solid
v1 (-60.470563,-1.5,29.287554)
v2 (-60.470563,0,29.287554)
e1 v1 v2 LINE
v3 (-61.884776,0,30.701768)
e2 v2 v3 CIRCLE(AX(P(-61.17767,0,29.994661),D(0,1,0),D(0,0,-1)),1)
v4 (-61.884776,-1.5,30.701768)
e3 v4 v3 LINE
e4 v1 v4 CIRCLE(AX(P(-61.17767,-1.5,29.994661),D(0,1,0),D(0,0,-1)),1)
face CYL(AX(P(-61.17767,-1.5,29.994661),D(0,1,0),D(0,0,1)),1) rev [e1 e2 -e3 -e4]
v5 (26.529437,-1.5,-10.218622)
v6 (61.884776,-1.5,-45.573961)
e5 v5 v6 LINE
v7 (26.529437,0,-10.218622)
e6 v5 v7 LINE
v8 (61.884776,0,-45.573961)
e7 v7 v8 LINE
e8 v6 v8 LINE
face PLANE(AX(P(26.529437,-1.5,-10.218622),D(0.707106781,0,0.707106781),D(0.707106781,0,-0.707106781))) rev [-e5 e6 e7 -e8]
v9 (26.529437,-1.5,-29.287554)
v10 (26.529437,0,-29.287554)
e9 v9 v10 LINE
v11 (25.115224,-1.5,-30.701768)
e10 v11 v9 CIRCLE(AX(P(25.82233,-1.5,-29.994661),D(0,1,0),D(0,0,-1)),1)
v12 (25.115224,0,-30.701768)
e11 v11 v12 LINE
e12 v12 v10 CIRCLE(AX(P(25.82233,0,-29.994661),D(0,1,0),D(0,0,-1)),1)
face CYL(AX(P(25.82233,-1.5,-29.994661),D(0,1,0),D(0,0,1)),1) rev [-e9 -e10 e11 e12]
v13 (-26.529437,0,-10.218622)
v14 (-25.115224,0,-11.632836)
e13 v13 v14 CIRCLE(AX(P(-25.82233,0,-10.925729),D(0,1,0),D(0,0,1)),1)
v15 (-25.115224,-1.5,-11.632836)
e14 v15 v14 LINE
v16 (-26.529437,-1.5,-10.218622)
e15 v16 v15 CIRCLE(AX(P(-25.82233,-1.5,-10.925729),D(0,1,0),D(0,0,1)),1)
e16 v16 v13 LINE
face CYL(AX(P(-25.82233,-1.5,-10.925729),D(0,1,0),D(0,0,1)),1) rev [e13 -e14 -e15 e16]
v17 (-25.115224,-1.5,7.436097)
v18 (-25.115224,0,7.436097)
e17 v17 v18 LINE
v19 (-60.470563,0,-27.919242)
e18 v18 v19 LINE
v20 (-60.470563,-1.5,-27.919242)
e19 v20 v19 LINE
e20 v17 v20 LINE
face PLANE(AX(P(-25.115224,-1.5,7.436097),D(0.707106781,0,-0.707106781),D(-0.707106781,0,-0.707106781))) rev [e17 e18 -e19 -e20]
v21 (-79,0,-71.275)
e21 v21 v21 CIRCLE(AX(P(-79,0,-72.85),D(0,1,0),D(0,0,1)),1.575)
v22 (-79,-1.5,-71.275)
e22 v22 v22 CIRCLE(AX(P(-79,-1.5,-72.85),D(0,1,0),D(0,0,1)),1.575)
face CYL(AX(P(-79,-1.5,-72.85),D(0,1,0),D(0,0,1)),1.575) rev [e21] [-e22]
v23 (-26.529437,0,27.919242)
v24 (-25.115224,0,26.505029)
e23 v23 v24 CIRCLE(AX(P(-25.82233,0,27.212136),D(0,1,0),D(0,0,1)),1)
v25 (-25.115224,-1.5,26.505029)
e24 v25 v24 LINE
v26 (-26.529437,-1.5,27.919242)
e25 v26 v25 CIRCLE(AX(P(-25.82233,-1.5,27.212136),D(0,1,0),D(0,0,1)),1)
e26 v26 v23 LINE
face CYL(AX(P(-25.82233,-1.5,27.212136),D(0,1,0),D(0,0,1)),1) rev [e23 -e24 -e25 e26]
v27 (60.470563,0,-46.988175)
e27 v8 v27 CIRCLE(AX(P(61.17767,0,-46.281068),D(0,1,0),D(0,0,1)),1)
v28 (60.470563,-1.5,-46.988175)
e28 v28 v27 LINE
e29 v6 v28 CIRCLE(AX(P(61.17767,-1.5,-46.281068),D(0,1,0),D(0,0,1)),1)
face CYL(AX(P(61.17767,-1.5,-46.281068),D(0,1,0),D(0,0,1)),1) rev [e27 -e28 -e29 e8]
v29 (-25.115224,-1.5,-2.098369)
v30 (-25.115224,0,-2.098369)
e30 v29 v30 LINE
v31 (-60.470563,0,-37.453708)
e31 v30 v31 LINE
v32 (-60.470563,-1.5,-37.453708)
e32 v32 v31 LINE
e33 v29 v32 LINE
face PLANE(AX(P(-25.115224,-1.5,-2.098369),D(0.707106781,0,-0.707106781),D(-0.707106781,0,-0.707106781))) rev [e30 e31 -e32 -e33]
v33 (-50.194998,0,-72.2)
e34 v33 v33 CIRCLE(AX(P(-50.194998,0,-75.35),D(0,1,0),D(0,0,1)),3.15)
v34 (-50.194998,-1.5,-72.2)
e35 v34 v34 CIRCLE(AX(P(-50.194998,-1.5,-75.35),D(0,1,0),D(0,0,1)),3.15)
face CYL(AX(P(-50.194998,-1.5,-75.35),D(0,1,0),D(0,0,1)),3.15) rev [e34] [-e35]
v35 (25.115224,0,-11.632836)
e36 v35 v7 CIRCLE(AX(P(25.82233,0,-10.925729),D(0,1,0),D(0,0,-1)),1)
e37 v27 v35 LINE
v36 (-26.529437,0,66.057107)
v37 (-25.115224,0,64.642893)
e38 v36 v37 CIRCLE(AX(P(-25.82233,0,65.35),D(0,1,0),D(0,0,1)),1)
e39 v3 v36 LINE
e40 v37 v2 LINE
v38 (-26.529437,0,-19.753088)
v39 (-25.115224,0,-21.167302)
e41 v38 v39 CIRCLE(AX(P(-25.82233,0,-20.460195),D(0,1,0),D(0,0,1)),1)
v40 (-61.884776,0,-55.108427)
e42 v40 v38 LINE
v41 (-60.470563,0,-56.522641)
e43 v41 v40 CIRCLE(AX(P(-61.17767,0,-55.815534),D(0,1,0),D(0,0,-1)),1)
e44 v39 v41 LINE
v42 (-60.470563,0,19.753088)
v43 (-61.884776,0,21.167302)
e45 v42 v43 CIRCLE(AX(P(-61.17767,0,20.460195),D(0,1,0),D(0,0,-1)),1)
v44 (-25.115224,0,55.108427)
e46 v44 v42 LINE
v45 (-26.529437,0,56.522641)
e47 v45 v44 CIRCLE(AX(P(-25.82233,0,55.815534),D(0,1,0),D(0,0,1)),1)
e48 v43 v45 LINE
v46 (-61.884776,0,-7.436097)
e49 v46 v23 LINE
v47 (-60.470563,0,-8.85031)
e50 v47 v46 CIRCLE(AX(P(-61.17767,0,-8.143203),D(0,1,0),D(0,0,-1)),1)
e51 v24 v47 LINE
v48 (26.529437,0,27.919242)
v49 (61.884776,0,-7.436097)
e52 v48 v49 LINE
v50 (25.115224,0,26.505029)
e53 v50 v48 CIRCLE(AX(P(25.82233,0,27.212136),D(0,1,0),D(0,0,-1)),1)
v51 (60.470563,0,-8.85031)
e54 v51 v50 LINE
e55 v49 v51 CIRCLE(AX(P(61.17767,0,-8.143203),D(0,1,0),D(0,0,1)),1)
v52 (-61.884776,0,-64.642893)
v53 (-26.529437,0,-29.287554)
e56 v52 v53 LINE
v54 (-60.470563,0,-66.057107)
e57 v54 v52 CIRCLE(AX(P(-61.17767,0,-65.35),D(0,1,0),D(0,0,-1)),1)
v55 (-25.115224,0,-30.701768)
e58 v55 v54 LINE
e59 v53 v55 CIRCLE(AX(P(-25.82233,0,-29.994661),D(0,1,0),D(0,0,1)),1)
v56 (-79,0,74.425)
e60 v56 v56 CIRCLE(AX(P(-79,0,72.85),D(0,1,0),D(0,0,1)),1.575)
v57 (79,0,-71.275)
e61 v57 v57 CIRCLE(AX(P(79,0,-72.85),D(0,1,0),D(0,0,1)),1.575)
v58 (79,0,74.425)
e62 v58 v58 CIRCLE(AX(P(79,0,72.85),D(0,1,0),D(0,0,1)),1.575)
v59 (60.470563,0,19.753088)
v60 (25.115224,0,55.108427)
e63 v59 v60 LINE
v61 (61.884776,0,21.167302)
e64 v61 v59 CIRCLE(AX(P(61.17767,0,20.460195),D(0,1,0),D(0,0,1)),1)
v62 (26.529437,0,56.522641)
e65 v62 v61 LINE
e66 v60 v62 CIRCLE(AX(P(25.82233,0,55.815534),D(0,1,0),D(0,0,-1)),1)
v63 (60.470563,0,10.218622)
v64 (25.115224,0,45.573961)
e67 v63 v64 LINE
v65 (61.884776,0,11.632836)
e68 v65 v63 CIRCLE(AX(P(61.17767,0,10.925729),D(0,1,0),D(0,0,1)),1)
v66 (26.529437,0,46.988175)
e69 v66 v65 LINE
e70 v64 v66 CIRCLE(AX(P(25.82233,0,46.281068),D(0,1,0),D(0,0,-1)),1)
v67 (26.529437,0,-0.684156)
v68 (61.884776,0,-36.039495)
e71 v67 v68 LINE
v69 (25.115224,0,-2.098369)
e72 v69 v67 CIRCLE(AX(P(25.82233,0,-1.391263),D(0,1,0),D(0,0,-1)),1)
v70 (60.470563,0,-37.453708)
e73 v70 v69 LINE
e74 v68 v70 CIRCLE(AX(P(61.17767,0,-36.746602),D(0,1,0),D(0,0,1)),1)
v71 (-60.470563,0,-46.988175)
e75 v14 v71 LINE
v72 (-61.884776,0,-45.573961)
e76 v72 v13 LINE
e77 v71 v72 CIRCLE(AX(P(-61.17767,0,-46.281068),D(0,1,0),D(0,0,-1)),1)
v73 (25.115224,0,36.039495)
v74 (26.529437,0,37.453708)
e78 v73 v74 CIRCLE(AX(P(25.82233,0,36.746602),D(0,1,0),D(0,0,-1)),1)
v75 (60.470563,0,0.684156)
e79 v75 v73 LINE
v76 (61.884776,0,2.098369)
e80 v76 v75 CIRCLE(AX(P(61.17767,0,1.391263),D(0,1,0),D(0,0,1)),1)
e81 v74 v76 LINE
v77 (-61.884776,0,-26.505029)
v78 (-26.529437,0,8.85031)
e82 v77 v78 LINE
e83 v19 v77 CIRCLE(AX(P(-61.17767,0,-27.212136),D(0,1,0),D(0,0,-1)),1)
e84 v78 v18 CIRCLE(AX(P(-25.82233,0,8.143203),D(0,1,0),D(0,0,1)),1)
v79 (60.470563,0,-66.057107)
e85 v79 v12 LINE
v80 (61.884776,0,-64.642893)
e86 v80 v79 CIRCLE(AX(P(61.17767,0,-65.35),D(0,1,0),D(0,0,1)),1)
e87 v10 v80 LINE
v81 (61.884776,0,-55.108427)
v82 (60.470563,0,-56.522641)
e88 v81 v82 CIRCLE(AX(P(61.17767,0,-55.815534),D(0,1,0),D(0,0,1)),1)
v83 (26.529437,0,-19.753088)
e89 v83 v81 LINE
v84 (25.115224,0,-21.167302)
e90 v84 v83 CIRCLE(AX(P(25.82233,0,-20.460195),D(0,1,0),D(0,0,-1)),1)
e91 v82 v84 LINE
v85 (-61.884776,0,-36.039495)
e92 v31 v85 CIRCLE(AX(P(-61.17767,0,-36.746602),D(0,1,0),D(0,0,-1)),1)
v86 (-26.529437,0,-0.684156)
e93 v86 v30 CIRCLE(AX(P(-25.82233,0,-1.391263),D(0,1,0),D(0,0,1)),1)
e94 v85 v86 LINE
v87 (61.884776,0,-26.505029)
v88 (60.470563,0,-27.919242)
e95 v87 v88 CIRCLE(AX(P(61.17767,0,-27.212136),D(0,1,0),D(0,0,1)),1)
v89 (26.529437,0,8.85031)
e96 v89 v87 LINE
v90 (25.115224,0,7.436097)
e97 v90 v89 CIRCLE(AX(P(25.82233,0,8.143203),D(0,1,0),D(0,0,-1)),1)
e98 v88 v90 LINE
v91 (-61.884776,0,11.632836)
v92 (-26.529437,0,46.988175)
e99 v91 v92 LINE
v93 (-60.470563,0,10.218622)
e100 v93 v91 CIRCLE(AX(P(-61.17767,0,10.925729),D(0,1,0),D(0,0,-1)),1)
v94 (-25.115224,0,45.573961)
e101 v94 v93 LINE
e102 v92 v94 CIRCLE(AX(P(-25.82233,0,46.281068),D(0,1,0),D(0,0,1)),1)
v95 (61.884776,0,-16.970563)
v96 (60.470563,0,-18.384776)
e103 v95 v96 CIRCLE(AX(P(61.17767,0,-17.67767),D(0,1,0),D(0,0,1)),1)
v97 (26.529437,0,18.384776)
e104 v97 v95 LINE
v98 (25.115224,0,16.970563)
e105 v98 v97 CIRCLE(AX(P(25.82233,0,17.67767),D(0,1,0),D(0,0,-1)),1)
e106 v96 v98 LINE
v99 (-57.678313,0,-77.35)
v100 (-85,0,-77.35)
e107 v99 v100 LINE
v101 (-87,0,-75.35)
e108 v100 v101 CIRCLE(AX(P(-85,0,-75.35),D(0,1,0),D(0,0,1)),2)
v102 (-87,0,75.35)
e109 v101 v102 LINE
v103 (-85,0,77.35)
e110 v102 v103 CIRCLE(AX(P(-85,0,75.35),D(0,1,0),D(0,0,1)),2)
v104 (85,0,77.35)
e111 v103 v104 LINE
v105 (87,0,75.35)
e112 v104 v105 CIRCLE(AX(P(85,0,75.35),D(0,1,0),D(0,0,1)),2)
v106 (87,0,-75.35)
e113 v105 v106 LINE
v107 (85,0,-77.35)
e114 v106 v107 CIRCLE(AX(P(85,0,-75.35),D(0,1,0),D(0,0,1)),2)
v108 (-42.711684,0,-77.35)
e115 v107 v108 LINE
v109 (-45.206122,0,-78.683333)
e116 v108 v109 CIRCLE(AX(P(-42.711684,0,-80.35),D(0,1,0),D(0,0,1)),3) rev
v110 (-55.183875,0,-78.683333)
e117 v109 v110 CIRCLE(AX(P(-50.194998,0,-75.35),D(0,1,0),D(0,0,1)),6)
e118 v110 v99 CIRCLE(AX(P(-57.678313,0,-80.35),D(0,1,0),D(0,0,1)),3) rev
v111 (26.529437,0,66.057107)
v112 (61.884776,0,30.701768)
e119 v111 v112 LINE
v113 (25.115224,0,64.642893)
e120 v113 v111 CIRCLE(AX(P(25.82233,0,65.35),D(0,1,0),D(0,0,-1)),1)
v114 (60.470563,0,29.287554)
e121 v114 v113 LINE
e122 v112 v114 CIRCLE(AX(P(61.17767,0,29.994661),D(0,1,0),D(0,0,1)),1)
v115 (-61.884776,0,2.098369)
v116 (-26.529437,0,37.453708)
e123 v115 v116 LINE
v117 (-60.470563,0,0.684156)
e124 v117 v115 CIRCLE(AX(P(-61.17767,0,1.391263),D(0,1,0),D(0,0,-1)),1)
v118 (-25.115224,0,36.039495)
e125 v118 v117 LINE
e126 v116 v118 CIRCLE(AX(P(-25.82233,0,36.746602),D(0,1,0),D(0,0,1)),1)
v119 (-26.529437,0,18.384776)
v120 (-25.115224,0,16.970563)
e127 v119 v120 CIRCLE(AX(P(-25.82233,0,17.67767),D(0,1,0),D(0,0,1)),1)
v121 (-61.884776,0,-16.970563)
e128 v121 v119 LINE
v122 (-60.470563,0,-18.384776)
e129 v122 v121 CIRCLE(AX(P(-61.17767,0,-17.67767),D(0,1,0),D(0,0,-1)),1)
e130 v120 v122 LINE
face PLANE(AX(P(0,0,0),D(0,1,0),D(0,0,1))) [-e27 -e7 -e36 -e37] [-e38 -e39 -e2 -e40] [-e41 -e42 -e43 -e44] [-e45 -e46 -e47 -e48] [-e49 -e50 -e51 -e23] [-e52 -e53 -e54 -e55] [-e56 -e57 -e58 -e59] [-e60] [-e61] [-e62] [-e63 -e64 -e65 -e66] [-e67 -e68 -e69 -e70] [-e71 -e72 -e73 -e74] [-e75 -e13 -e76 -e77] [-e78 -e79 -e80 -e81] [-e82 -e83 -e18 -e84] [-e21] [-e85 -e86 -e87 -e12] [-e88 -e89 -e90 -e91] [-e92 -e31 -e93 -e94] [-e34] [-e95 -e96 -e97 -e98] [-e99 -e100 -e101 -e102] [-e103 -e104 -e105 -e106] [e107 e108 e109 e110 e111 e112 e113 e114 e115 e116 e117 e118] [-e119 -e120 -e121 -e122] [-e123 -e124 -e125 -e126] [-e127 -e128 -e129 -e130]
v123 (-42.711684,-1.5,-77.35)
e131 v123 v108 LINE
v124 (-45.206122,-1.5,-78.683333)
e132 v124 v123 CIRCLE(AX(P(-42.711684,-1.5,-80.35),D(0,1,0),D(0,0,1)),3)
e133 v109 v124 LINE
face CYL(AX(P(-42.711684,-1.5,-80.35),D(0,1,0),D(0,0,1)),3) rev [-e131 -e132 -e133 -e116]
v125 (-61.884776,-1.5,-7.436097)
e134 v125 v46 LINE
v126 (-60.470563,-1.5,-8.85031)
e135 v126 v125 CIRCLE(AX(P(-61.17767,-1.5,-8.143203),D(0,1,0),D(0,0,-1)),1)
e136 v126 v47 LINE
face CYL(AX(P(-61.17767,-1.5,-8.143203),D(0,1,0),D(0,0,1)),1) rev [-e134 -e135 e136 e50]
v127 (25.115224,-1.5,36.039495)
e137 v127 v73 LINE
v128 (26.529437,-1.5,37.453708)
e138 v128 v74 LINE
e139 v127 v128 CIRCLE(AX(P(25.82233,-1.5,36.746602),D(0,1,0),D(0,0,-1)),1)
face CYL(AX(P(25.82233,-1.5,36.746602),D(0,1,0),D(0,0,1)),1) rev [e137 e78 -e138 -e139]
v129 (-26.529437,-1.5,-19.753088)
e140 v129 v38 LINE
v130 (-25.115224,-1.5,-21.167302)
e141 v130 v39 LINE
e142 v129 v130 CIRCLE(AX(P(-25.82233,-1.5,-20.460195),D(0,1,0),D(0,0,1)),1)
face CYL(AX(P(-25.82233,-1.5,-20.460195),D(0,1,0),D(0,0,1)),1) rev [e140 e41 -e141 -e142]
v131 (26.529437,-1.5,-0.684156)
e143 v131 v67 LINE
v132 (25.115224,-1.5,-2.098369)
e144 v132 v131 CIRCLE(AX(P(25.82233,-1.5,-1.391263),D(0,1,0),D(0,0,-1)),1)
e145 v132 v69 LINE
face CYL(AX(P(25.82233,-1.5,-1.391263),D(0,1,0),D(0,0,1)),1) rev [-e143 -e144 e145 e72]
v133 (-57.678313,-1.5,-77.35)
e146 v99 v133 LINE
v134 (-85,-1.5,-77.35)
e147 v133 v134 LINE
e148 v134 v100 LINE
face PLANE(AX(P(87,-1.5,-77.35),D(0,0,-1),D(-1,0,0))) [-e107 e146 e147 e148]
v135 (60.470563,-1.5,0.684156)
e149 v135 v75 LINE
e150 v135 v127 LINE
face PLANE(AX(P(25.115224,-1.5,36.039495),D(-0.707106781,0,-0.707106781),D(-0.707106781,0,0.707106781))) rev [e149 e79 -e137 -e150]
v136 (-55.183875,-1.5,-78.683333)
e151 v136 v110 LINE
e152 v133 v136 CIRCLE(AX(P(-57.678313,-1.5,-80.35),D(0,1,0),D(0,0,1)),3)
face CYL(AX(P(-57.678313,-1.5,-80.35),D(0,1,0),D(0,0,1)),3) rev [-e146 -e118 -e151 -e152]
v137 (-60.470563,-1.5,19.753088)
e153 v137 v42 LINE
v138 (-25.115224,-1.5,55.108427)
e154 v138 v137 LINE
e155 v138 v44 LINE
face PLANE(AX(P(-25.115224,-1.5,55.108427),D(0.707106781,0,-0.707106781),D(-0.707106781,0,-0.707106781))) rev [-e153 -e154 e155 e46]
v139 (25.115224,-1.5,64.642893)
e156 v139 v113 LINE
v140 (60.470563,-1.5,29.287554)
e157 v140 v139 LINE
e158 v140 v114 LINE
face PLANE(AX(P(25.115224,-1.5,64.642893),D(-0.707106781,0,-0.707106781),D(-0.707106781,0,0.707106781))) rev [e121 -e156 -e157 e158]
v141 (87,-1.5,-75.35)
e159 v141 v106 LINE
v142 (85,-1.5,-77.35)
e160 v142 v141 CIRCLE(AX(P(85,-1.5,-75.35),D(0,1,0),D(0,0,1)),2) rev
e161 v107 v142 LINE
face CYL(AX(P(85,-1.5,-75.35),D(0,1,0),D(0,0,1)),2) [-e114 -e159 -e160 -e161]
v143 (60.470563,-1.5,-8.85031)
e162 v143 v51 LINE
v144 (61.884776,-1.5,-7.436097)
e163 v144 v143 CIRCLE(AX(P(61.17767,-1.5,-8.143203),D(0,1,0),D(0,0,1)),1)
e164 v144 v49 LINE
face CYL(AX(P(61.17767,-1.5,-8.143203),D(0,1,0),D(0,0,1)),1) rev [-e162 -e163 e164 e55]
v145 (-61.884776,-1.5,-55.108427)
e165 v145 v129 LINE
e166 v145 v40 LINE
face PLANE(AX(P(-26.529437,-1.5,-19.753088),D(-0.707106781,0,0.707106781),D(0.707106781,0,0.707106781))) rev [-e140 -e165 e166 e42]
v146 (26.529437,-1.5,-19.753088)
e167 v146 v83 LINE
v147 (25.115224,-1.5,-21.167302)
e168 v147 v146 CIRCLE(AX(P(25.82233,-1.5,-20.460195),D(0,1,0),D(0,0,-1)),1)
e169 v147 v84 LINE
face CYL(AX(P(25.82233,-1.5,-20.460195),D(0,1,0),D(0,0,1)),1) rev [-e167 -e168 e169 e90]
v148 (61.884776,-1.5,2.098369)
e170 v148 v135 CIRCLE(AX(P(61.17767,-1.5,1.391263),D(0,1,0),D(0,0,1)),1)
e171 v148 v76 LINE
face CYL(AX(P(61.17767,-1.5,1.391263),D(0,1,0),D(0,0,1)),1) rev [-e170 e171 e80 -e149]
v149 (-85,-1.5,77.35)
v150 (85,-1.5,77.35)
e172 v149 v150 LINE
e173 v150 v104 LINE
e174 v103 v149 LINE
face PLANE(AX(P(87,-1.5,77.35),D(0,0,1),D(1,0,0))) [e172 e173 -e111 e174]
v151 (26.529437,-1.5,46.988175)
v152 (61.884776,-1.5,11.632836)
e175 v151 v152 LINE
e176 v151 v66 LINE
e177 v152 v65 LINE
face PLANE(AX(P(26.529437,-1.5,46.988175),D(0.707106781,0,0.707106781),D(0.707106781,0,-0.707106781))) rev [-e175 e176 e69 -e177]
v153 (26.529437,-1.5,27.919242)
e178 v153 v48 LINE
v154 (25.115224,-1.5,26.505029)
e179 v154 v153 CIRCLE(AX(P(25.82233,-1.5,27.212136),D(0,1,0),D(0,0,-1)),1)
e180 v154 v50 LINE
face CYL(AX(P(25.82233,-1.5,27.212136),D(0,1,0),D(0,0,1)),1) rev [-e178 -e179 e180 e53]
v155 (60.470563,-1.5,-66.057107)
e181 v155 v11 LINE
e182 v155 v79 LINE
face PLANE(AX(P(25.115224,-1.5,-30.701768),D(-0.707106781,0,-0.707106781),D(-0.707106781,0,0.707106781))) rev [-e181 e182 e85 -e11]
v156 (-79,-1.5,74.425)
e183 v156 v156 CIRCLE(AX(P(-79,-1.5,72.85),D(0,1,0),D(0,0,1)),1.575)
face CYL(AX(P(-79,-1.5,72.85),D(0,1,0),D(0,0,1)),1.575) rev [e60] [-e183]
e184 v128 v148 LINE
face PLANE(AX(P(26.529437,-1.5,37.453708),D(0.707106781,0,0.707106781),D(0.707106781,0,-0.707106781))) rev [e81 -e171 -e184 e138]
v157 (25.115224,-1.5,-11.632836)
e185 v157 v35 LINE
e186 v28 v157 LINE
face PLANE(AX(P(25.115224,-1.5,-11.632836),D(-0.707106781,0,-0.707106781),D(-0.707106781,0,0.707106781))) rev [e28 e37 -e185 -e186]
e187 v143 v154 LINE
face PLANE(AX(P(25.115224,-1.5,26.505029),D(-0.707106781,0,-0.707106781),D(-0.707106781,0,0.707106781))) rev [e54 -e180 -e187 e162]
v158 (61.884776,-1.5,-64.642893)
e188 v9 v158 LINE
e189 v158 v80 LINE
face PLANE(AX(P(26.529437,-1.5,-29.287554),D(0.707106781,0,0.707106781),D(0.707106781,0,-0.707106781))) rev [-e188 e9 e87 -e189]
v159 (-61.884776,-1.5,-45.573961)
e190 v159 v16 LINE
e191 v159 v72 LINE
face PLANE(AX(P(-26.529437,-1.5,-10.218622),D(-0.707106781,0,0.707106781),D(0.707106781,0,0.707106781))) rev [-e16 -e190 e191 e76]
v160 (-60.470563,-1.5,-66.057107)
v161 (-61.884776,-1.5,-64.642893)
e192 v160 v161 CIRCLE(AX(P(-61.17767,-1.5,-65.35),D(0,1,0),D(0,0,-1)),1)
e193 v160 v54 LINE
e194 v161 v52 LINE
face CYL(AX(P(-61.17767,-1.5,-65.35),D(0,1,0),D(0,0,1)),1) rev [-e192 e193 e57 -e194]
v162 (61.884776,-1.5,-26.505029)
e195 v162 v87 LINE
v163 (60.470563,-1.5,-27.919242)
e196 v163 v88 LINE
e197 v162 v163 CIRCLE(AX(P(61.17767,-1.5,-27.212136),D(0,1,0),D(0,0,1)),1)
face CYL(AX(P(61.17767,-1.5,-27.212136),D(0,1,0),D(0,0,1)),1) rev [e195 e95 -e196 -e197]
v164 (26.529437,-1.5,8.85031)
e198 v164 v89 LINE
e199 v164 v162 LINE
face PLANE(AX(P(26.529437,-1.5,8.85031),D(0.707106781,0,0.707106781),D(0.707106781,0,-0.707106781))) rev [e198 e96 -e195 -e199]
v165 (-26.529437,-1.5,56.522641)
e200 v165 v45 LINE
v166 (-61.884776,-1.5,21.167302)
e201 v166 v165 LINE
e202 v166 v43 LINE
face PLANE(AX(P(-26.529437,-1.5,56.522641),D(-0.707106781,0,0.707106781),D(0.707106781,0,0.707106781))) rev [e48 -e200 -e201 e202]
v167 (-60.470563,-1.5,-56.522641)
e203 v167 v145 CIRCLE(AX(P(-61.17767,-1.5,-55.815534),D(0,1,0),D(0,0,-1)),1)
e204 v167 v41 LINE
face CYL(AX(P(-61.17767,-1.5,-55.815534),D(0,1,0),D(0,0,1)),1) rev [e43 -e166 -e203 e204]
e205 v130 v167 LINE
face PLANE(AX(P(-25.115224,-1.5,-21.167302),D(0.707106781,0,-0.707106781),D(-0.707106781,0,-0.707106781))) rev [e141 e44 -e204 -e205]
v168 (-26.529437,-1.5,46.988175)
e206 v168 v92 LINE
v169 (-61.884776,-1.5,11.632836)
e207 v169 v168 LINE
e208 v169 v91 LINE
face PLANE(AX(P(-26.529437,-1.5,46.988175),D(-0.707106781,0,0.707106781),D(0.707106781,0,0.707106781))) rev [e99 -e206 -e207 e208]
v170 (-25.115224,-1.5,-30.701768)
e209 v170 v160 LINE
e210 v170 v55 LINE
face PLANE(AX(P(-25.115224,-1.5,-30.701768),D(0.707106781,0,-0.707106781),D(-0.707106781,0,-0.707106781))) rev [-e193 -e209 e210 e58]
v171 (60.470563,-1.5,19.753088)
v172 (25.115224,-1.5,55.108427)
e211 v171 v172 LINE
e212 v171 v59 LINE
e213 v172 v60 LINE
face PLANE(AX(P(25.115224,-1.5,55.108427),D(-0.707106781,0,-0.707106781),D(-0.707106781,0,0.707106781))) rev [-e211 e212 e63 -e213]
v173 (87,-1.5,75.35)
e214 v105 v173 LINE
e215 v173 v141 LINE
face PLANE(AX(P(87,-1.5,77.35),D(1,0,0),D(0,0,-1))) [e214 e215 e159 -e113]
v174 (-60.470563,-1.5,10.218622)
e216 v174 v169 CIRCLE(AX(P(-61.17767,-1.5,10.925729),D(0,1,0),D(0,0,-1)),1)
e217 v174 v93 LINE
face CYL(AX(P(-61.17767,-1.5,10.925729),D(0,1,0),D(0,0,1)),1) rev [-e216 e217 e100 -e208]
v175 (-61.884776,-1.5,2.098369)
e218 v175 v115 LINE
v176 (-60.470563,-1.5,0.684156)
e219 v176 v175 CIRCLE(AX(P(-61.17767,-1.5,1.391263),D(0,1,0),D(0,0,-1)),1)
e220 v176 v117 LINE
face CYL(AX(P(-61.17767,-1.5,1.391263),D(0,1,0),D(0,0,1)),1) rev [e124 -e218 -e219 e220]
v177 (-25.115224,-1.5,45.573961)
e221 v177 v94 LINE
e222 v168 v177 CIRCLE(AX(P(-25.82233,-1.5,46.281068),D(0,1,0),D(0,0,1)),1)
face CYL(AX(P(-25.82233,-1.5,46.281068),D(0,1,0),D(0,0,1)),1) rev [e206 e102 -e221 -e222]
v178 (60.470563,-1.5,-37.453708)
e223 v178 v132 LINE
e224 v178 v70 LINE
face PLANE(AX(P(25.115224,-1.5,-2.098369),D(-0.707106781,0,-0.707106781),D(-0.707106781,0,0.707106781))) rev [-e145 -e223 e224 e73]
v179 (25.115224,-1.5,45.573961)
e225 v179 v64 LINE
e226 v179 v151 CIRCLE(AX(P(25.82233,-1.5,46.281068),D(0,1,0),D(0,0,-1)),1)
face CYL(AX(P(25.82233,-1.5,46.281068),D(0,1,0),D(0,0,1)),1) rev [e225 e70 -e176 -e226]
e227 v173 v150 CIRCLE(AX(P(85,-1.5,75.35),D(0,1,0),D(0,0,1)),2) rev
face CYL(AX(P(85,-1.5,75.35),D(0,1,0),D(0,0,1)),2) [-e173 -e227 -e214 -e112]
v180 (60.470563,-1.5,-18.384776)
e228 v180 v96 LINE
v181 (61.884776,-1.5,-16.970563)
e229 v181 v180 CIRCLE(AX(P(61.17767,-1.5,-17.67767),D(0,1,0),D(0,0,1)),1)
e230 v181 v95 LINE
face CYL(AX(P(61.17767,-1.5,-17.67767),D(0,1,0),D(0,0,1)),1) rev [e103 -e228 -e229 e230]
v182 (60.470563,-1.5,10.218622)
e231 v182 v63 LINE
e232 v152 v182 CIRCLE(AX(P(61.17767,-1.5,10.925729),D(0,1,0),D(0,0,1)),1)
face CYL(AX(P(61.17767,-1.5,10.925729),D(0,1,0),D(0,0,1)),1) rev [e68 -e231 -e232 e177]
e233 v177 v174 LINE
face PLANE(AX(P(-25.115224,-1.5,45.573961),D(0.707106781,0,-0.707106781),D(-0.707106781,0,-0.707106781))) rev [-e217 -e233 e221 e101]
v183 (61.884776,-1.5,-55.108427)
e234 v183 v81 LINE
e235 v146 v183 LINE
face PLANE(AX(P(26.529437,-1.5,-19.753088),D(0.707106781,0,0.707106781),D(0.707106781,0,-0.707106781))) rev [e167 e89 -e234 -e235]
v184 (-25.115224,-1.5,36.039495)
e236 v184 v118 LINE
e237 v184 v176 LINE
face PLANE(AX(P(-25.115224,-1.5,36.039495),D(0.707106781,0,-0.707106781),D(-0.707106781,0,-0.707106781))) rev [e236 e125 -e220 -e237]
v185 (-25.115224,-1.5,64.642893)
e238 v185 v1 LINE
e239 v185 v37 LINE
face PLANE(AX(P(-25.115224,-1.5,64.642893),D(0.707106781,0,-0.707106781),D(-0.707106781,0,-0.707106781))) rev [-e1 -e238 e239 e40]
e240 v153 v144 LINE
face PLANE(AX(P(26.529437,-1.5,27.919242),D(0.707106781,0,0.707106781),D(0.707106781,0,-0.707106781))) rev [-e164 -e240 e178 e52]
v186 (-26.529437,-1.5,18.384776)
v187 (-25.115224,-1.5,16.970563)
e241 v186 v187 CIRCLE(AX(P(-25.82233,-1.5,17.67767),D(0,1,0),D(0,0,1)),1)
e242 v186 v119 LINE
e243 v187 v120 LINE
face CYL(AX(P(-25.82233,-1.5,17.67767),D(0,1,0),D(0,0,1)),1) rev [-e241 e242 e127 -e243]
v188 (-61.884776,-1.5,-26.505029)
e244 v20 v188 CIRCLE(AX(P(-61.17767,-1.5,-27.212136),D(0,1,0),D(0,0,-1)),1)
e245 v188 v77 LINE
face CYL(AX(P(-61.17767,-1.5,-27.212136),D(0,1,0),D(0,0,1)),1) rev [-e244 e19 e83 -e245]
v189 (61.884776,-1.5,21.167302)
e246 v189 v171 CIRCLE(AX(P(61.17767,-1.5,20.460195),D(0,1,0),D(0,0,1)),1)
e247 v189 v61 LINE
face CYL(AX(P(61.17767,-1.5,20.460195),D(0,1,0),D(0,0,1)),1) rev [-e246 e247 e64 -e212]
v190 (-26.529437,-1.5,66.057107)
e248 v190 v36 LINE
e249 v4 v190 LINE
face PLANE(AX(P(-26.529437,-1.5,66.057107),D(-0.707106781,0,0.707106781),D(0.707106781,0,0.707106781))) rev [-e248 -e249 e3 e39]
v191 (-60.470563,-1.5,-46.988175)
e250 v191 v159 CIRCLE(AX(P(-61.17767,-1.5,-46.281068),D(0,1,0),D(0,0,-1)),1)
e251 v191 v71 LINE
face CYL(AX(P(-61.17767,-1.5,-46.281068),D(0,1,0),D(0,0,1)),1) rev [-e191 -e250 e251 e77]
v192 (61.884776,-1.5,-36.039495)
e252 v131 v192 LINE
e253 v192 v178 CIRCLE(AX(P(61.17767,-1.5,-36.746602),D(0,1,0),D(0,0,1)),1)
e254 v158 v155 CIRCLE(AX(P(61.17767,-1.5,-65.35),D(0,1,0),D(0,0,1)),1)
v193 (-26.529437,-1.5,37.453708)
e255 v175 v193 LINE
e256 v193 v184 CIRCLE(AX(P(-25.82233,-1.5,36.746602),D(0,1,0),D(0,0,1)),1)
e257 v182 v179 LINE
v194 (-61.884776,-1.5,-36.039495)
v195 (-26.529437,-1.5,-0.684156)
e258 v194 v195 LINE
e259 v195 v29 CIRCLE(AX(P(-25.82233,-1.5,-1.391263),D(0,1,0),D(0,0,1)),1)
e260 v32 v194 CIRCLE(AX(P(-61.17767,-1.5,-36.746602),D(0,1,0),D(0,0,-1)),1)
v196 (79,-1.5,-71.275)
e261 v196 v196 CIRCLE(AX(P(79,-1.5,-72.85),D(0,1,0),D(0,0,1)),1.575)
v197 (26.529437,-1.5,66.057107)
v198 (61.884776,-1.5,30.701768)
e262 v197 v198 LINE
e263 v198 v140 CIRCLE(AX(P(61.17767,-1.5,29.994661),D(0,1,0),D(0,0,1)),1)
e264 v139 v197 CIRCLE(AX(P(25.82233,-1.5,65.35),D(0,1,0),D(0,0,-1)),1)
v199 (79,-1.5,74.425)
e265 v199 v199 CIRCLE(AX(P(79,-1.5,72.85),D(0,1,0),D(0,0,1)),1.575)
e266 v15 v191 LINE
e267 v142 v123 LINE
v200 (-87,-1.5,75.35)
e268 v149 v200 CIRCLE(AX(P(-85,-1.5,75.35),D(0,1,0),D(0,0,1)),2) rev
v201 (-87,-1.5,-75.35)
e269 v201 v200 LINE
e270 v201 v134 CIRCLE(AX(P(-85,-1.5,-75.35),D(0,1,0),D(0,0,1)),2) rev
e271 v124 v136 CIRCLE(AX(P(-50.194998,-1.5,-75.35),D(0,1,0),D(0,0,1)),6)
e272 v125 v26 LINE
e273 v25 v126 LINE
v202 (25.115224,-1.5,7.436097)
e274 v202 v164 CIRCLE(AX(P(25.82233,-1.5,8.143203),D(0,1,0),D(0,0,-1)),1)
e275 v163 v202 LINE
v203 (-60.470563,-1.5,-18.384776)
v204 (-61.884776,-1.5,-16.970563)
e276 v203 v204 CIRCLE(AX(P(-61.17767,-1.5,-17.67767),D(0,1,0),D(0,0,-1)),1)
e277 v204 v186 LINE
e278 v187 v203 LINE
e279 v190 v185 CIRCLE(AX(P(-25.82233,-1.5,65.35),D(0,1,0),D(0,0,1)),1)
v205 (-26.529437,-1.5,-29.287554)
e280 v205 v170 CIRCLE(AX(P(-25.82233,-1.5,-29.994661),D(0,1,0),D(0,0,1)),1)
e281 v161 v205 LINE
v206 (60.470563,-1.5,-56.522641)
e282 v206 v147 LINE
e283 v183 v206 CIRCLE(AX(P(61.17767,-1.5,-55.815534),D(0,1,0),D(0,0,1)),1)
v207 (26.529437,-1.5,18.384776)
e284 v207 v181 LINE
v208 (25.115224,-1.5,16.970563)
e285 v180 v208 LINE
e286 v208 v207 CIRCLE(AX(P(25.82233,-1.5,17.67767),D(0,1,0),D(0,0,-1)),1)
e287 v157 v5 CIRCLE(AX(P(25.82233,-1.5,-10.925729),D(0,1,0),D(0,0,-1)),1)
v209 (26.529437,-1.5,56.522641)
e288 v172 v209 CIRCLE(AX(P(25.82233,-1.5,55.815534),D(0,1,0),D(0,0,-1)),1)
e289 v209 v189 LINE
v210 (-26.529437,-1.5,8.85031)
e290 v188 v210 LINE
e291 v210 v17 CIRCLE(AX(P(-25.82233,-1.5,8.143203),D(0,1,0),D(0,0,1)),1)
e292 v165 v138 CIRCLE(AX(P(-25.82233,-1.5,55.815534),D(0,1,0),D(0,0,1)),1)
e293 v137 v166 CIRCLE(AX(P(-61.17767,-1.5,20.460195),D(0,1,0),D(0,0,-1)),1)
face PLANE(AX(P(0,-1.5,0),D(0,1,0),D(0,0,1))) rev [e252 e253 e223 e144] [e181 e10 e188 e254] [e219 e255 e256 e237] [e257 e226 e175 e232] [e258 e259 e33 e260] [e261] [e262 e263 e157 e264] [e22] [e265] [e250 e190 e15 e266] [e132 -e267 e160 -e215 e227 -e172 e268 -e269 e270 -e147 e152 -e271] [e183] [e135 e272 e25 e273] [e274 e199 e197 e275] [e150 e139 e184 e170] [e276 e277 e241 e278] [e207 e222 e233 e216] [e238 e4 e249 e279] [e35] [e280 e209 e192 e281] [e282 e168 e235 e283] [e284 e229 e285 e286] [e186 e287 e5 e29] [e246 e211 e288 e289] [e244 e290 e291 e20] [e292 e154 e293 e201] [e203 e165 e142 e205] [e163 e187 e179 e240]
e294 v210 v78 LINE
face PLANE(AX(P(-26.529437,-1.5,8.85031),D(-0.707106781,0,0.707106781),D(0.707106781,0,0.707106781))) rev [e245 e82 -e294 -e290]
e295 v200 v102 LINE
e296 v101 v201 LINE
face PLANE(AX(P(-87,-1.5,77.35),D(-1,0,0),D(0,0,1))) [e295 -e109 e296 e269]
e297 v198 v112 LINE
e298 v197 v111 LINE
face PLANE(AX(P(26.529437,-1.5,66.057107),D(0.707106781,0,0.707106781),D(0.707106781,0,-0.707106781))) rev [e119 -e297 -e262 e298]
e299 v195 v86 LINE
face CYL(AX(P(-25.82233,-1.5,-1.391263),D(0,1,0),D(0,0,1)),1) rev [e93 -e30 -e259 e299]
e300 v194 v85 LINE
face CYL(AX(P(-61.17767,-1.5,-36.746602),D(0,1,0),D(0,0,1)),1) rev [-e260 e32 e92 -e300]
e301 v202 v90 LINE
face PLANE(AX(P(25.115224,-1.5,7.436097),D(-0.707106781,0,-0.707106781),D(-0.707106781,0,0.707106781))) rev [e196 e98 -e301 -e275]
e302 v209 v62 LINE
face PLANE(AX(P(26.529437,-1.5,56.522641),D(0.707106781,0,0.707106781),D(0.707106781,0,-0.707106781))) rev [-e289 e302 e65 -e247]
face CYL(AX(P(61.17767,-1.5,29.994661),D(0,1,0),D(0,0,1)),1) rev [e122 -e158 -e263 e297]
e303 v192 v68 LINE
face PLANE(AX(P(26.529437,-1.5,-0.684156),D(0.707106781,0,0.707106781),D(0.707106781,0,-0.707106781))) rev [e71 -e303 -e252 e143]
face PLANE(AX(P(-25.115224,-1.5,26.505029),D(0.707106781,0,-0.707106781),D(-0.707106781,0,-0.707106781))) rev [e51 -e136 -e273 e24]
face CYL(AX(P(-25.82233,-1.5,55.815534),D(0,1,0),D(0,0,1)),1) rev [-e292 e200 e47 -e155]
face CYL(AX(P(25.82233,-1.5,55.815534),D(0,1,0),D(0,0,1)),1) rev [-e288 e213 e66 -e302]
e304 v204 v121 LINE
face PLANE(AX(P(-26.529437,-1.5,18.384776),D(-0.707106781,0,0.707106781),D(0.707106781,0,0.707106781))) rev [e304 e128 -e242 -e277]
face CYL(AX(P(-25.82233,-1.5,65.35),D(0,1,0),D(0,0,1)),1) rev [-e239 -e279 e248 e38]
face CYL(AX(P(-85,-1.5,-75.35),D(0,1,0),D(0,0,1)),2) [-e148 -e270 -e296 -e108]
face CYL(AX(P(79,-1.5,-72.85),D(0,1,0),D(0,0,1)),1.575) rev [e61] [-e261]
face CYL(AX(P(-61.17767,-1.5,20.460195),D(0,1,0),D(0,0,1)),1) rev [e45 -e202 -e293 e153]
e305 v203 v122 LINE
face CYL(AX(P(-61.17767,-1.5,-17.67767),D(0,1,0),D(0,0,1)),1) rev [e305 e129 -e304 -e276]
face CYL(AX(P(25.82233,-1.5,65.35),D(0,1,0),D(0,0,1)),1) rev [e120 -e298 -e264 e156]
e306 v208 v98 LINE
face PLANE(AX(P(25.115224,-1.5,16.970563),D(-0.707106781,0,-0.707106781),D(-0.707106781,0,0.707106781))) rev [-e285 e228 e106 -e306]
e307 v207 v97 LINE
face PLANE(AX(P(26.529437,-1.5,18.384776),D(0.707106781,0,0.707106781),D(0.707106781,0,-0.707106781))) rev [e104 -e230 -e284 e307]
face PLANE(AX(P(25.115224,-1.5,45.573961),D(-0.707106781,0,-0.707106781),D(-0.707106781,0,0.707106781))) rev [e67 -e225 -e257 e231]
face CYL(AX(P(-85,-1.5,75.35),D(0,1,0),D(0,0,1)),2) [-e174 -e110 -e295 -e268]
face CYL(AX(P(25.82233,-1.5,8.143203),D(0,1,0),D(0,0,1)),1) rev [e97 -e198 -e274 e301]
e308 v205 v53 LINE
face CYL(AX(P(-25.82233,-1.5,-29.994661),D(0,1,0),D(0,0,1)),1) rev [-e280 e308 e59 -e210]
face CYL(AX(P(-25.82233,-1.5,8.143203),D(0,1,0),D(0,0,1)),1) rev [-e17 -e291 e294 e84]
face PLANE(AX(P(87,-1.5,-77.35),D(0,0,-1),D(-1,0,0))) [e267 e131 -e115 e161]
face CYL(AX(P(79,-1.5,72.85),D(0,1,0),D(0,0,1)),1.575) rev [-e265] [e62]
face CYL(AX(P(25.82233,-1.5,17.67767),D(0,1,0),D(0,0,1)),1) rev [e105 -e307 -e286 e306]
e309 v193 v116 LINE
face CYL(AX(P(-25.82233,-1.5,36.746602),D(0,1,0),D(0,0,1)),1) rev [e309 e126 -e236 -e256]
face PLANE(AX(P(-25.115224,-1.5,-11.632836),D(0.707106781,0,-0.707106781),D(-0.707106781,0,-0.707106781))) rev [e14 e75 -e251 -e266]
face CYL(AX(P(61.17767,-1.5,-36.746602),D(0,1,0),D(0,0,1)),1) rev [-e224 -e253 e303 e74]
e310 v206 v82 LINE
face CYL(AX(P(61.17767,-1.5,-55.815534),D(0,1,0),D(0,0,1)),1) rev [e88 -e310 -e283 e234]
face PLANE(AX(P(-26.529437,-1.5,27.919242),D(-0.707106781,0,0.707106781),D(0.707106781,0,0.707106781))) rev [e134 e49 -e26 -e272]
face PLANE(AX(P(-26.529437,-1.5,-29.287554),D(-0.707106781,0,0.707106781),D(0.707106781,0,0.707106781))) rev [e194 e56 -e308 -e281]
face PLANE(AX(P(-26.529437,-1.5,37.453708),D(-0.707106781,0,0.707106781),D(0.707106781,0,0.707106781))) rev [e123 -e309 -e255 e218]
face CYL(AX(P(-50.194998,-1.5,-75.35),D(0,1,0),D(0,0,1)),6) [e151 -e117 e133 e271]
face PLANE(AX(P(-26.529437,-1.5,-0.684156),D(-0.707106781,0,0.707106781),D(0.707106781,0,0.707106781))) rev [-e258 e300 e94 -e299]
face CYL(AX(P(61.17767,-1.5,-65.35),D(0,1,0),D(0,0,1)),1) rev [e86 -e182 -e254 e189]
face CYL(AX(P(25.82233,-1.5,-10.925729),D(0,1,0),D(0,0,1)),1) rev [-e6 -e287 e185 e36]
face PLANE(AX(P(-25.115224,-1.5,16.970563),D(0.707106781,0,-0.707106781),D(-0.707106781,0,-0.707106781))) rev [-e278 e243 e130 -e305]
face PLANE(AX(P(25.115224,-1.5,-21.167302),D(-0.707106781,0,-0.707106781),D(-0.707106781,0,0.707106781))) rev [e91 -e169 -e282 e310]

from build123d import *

# Parameters (mm, degrees)
SKETCH1_W          = 174
SKETCH1_H          = 154.7
SKETCH1_R          = 1.575
BASE_FLANGE1_DEPTH = 1.5
FILLET1_R          = 2
CUT_EXTRUDE1_DEPTH = 117.422817781
SKETCH7_R          = 6
TAB1_DEPTH         = 1.5
SKETCH10_R         = 3.15
CUT_EXTRUDE2_DEPTH = 120.117893282
FILLET2_R          = 3


# Sheet-metal steps are written as plain solids
with BuildPart() as part:
    # Sketch1 → Base-Flange1 (new body)
    with BuildSketch(Plane(origin=(0, 0, 0), x_dir=(1, 0, 0), z_dir=(0, 1, 0))):
        Rectangle(SKETCH1_W, SKETCH1_H)
        with Locations(Location((-79, 72.85, 0), (0, 0, 270))):
            Circle(SKETCH1_R, mode=Mode.SUBTRACT)
        with Locations(Location((79, 72.85, 0), (0, 0, 270))):
            Circle(SKETCH1_R, mode=Mode.SUBTRACT)
        with Locations(Location((79, -72.85, 0), (0, 0, 270))):
            Circle(SKETCH1_R, mode=Mode.SUBTRACT)
        with Locations(Location((-79, -72.85, 0), (0, 0, 270))):
            Circle(SKETCH1_R, mode=Mode.SUBTRACT)
    extrude(amount=-BASE_FLANGE1_DEPTH)

    # Fillet1
    fillet1_edges = [part.edges().sort_by_distance(p)[0] for p in [
        (-87, -0.75, -77.35),
        (87, -0.75, -77.35),
        (87, -0.75, 77.35),
        (-87, -0.75, 77.35),
    ]]
    fillet(fillet1_edges, radius=FILLET1_R)

    # Sketch6 → Cut-Extrude1 (cut, through all)
    with BuildSketch(Plane(origin=(0, 0, 0), x_dir=(1, 0, 0), z_dir=(0, 1, 0))):
        with BuildLine():
            Line((26.529437252, -66.057106781), (61.884776311, -30.701767722))
            ThreePointArc((61.884776311, -30.701767722), (61.884776311, -29.287554159), (60.470562748, -29.287554159))
            Line((60.470562748, -29.287554159), (25.115223689, -64.642893219))
            ThreePointArc((25.115223689, -64.642893219), (25.115223689, -66.057106781), (26.529437252, -66.057106781))
        make_face()
        with BuildLine():
            Line((26.529437252, -56.522640687), (61.884776311, -21.167301628))
            ThreePointArc((61.884776311, -21.167301628), (61.884776311, -19.753088065), (60.470562748, -19.753088065))
            Line((60.470562748, -19.753088065), (25.115223689, -55.108427125))
            ThreePointArc((25.115223689, -55.108427125), (25.115223689, -56.522640687), (26.529437252, -56.522640687))
        make_face()
        with BuildLine():
            Line((26.529437252, -46.988174593), (61.884776311, -11.632835534))
            ThreePointArc((61.884776311, -11.632835534), (61.884776311, -10.218621971), (60.470562748, -10.218621971))
            Line((60.470562748, -10.218621971), (25.115223689, -45.573961031))
            ThreePointArc((25.115223689, -45.573961031), (25.115223689, -46.988174593), (26.529437252, -46.988174593))
        make_face()
        with BuildLine():
            Line((26.529437252, -37.453708499), (61.884776311, -2.09836944))
            ThreePointArc((61.884776311, -2.09836944), (61.884776311, -0.684155877), (60.470562748, -0.684155877))
            Line((60.470562748, -0.684155877), (25.115223689, -36.039494937))
            ThreePointArc((25.115223689, -36.039494937), (25.115223689, -37.453708499), (26.529437252, -37.453708499))
        make_face()
        with BuildLine():
            Line((26.529437252, -27.919242405), (61.884776311, 7.436096654))
            ThreePointArc((61.884776311, 7.436096654), (61.884776311, 8.850310217), (60.470562748, 8.850310217))
            Line((60.470562748, 8.850310217), (25.115223689, -26.505028843))
            ThreePointArc((25.115223689, -26.505028843), (25.115223689, -27.919242405), (26.529437252, -27.919242405))
        make_face()
        with BuildLine():
            Line((26.529437252, -18.384776311), (61.884776311, 16.970562748))
            ThreePointArc((61.884776311, 16.970562748), (61.884776311, 18.384776311), (60.470562748, 18.384776311))
            Line((60.470562748, 18.384776311), (25.115223689, -16.970562748))
            ThreePointArc((25.115223689, -16.970562748), (25.115223689, -18.384776311), (26.529437252, -18.384776311))
        make_face()
        with BuildLine():
            Line((26.529437252, -8.850310217), (61.884776311, 26.505028843))
            ThreePointArc((61.884776311, 26.505028843), (61.884776311, 27.919242405), (60.470562748, 27.919242405))
            Line((60.470562748, 27.919242405), (25.115223689, -7.436096654))
            ThreePointArc((25.115223689, -7.436096654), (25.115223689, -8.850310217), (26.529437252, -8.850310217))
        make_face()
        with BuildLine():
            Line((26.529437252, 0.684155877), (61.884776311, 36.039494937))
            ThreePointArc((61.884776311, 36.039494937), (61.884776311, 37.453708499), (60.470562748, 37.453708499))
            Line((60.470562748, 37.453708499), (25.115223689, 2.09836944))
            ThreePointArc((25.115223689, 2.09836944), (25.115223689, 0.684155877), (26.529437252, 0.684155877))
        make_face()
        with BuildLine():
            Line((26.529437252, 10.218621971), (61.884776311, 45.573961031))
            ThreePointArc((61.884776311, 45.573961031), (61.884776311, 46.988174593), (60.470562748, 46.988174593))
            Line((60.470562748, 46.988174593), (25.115223689, 11.632835534))
            ThreePointArc((25.115223689, 11.632835534), (25.115223689, 10.218621971), (26.529437252, 10.218621971))
        make_face()
        with BuildLine():
            Line((26.529437252, 19.753088065), (61.884776311, 55.108427125))
            ThreePointArc((61.884776311, 55.108427125), (61.884776311, 56.522640687), (60.470562748, 56.522640687))
            Line((60.470562748, 56.522640687), (25.115223689, 21.167301628))
            ThreePointArc((25.115223689, 21.167301628), (25.115223689, 19.753088065), (26.529437252, 19.753088065))
        make_face()
        with BuildLine():
            Line((26.529437252, 29.287554159), (61.884776311, 64.642893219))
            ThreePointArc((61.884776311, 64.642893219), (61.884776311, 66.057106781), (60.470562748, 66.057106781))
            Line((60.470562748, 66.057106781), (25.115223689, 30.701767722))
            ThreePointArc((25.115223689, 30.701767722), (25.115223689, 29.287554159), (26.529437252, 29.287554159))
        make_face()
        with BuildLine():
            Line((-25.115223689, 30.701767722), (-60.470562748, 66.057106781))
            ThreePointArc((-60.470562748, 66.057106781), (-61.884776311, 66.057106781), (-61.884776311, 64.642893219))
            Line((-61.884776311, 64.642893219), (-26.529437252, 29.287554159))
            ThreePointArc((-26.529437252, 29.287554159), (-25.115223689, 29.287554159), (-25.115223689, 30.701767722))
        make_face()
        with BuildLine():
            Line((-25.115223689, 21.167301628), (-60.470562748, 56.522640687))
            ThreePointArc((-60.470562748, 56.522640687), (-61.884776311, 56.522640687), (-61.884776311, 55.108427125))
            Line((-61.884776311, 55.108427125), (-26.529437252, 19.753088065))
            ThreePointArc((-26.529437252, 19.753088065), (-25.115223689, 19.753088065), (-25.115223689, 21.167301628))
        make_face()
        with BuildLine():
            Line((-25.115223689, 11.632835534), (-60.470562748, 46.988174593))
            ThreePointArc((-60.470562748, 46.988174593), (-61.884776311, 46.988174593), (-61.884776311, 45.573961031))
            Line((-61.884776311, 45.573961031), (-26.529437252, 10.218621971))
            ThreePointArc((-26.529437252, 10.218621971), (-25.115223689, 10.218621971), (-25.115223689, 11.632835534))
        make_face()
        with BuildLine():
            Line((-25.115223689, 2.09836944), (-60.470562748, 37.453708499))
            ThreePointArc((-60.470562748, 37.453708499), (-61.884776311, 37.453708499), (-61.884776311, 36.039494937))
            Line((-61.884776311, 36.039494937), (-26.529437252, 0.684155877))
            ThreePointArc((-26.529437252, 0.684155877), (-25.115223689, 0.684155877), (-25.115223689, 2.09836944))
        make_face()
        with BuildLine():
            Line((-25.115223689, -7.436096654), (-60.470562748, 27.919242405))
            ThreePointArc((-60.470562748, 27.919242405), (-61.884776311, 27.919242405), (-61.884776311, 26.505028843))
            Line((-61.884776311, 26.505028843), (-26.529437252, -8.850310217))
            ThreePointArc((-26.529437252, -8.850310217), (-25.115223689, -8.850310217), (-25.115223689, -7.436096654))
        make_face()
        with BuildLine():
            Line((-25.115223689, -16.970562748), (-60.470562748, 18.384776311))
            ThreePointArc((-60.470562748, 18.384776311), (-61.884776311, 18.384776311), (-61.884776311, 16.970562748))
            Line((-61.884776311, 16.970562748), (-26.529437252, -18.384776311))
            ThreePointArc((-26.529437252, -18.384776311), (-25.115223689, -18.384776311), (-25.115223689, -16.970562748))
        make_face()
        with BuildLine():
            Line((-25.115223689, -26.505028843), (-60.470562748, 8.850310217))
            ThreePointArc((-60.470562748, 8.850310217), (-61.884776311, 8.850310217), (-61.884776311, 7.436096654))
            Line((-61.884776311, 7.436096654), (-26.529437252, -27.919242405))
            ThreePointArc((-26.529437252, -27.919242405), (-25.115223689, -27.919242405), (-25.115223689, -26.505028843))
        make_face()
        with BuildLine():
            Line((-25.115223689, -36.039494937), (-60.470562748, -0.684155877))
            ThreePointArc((-60.470562748, -0.684155877), (-61.884776311, -0.684155877), (-61.884776311, -2.09836944))
            Line((-61.884776311, -2.09836944), (-26.529437252, -37.453708499))
            ThreePointArc((-26.529437252, -37.453708499), (-25.115223689, -37.453708499), (-25.115223689, -36.039494937))
        make_face()
        with BuildLine():
            Line((-25.115223689, -45.573961031), (-60.470562748, -10.218621971))
            ThreePointArc((-60.470562748, -10.218621971), (-61.884776311, -10.218621971), (-61.884776311, -11.632835534))
            Line((-61.884776311, -11.632835534), (-26.529437252, -46.988174593))
            ThreePointArc((-26.529437252, -46.988174593), (-25.115223689, -46.988174593), (-25.115223689, -45.573961031))
        make_face()
        with BuildLine():
            Line((-25.115223689, -55.108427125), (-60.470562748, -19.753088065))
            ThreePointArc((-60.470562748, -19.753088065), (-61.884776311, -19.753088065), (-61.884776311, -21.167301628))
            Line((-61.884776311, -21.167301628), (-26.529437252, -56.522640687))
            ThreePointArc((-26.529437252, -56.522640687), (-25.115223689, -56.522640687), (-25.115223689, -55.108427125))
        make_face()
        with BuildLine():
            Line((-25.115223689, -64.642893219), (-60.470562748, -29.287554159))
            ThreePointArc((-60.470562748, -29.287554159), (-61.884776311, -29.287554159), (-61.884776311, -30.701767722))
            Line((-61.884776311, -30.701767722), (-26.529437252, -66.057106781))
            ThreePointArc((-26.529437252, -66.057106781), (-25.115223689, -66.057106781), (-25.115223689, -64.642893219))
        make_face()
    extrude(amount=-CUT_EXTRUDE1_DEPTH, mode=Mode.SUBTRACT)

    # Sketch7 → Tab1 (add)
    with BuildSketch(Plane(origin=(0, 0, 0), x_dir=(1, 0, 0), z_dir=(0, 1, 0))):
        with Locations((-50.194998341, 75.35)):
            Circle(SKETCH7_R)
    extrude(amount=-TAB1_DEPTH)

    # Sketch10 → Cut-Extrude2 (cut, through all)
    with BuildSketch(Plane(origin=(0, 0, 0), x_dir=(1, 0, 0), z_dir=(0, 1, 0))):
        with Locations(Location((-50.194998341, 75.35, 0), (0, 0, 270))):
            Circle(SKETCH10_R)
    extrude(amount=-CUT_EXTRUDE2_DEPTH, mode=Mode.SUBTRACT)

    # Fillet2
    fillet2_edges = [part.edges().sort_by_distance(p)[0] for p in [
        (-55.85185259, -0.75, -77.35),
        (-44.538144091, -0.75, -77.35),
    ]]
    fillet(fillet2_edges, radius=FILLET2_R)


solid = part.part
